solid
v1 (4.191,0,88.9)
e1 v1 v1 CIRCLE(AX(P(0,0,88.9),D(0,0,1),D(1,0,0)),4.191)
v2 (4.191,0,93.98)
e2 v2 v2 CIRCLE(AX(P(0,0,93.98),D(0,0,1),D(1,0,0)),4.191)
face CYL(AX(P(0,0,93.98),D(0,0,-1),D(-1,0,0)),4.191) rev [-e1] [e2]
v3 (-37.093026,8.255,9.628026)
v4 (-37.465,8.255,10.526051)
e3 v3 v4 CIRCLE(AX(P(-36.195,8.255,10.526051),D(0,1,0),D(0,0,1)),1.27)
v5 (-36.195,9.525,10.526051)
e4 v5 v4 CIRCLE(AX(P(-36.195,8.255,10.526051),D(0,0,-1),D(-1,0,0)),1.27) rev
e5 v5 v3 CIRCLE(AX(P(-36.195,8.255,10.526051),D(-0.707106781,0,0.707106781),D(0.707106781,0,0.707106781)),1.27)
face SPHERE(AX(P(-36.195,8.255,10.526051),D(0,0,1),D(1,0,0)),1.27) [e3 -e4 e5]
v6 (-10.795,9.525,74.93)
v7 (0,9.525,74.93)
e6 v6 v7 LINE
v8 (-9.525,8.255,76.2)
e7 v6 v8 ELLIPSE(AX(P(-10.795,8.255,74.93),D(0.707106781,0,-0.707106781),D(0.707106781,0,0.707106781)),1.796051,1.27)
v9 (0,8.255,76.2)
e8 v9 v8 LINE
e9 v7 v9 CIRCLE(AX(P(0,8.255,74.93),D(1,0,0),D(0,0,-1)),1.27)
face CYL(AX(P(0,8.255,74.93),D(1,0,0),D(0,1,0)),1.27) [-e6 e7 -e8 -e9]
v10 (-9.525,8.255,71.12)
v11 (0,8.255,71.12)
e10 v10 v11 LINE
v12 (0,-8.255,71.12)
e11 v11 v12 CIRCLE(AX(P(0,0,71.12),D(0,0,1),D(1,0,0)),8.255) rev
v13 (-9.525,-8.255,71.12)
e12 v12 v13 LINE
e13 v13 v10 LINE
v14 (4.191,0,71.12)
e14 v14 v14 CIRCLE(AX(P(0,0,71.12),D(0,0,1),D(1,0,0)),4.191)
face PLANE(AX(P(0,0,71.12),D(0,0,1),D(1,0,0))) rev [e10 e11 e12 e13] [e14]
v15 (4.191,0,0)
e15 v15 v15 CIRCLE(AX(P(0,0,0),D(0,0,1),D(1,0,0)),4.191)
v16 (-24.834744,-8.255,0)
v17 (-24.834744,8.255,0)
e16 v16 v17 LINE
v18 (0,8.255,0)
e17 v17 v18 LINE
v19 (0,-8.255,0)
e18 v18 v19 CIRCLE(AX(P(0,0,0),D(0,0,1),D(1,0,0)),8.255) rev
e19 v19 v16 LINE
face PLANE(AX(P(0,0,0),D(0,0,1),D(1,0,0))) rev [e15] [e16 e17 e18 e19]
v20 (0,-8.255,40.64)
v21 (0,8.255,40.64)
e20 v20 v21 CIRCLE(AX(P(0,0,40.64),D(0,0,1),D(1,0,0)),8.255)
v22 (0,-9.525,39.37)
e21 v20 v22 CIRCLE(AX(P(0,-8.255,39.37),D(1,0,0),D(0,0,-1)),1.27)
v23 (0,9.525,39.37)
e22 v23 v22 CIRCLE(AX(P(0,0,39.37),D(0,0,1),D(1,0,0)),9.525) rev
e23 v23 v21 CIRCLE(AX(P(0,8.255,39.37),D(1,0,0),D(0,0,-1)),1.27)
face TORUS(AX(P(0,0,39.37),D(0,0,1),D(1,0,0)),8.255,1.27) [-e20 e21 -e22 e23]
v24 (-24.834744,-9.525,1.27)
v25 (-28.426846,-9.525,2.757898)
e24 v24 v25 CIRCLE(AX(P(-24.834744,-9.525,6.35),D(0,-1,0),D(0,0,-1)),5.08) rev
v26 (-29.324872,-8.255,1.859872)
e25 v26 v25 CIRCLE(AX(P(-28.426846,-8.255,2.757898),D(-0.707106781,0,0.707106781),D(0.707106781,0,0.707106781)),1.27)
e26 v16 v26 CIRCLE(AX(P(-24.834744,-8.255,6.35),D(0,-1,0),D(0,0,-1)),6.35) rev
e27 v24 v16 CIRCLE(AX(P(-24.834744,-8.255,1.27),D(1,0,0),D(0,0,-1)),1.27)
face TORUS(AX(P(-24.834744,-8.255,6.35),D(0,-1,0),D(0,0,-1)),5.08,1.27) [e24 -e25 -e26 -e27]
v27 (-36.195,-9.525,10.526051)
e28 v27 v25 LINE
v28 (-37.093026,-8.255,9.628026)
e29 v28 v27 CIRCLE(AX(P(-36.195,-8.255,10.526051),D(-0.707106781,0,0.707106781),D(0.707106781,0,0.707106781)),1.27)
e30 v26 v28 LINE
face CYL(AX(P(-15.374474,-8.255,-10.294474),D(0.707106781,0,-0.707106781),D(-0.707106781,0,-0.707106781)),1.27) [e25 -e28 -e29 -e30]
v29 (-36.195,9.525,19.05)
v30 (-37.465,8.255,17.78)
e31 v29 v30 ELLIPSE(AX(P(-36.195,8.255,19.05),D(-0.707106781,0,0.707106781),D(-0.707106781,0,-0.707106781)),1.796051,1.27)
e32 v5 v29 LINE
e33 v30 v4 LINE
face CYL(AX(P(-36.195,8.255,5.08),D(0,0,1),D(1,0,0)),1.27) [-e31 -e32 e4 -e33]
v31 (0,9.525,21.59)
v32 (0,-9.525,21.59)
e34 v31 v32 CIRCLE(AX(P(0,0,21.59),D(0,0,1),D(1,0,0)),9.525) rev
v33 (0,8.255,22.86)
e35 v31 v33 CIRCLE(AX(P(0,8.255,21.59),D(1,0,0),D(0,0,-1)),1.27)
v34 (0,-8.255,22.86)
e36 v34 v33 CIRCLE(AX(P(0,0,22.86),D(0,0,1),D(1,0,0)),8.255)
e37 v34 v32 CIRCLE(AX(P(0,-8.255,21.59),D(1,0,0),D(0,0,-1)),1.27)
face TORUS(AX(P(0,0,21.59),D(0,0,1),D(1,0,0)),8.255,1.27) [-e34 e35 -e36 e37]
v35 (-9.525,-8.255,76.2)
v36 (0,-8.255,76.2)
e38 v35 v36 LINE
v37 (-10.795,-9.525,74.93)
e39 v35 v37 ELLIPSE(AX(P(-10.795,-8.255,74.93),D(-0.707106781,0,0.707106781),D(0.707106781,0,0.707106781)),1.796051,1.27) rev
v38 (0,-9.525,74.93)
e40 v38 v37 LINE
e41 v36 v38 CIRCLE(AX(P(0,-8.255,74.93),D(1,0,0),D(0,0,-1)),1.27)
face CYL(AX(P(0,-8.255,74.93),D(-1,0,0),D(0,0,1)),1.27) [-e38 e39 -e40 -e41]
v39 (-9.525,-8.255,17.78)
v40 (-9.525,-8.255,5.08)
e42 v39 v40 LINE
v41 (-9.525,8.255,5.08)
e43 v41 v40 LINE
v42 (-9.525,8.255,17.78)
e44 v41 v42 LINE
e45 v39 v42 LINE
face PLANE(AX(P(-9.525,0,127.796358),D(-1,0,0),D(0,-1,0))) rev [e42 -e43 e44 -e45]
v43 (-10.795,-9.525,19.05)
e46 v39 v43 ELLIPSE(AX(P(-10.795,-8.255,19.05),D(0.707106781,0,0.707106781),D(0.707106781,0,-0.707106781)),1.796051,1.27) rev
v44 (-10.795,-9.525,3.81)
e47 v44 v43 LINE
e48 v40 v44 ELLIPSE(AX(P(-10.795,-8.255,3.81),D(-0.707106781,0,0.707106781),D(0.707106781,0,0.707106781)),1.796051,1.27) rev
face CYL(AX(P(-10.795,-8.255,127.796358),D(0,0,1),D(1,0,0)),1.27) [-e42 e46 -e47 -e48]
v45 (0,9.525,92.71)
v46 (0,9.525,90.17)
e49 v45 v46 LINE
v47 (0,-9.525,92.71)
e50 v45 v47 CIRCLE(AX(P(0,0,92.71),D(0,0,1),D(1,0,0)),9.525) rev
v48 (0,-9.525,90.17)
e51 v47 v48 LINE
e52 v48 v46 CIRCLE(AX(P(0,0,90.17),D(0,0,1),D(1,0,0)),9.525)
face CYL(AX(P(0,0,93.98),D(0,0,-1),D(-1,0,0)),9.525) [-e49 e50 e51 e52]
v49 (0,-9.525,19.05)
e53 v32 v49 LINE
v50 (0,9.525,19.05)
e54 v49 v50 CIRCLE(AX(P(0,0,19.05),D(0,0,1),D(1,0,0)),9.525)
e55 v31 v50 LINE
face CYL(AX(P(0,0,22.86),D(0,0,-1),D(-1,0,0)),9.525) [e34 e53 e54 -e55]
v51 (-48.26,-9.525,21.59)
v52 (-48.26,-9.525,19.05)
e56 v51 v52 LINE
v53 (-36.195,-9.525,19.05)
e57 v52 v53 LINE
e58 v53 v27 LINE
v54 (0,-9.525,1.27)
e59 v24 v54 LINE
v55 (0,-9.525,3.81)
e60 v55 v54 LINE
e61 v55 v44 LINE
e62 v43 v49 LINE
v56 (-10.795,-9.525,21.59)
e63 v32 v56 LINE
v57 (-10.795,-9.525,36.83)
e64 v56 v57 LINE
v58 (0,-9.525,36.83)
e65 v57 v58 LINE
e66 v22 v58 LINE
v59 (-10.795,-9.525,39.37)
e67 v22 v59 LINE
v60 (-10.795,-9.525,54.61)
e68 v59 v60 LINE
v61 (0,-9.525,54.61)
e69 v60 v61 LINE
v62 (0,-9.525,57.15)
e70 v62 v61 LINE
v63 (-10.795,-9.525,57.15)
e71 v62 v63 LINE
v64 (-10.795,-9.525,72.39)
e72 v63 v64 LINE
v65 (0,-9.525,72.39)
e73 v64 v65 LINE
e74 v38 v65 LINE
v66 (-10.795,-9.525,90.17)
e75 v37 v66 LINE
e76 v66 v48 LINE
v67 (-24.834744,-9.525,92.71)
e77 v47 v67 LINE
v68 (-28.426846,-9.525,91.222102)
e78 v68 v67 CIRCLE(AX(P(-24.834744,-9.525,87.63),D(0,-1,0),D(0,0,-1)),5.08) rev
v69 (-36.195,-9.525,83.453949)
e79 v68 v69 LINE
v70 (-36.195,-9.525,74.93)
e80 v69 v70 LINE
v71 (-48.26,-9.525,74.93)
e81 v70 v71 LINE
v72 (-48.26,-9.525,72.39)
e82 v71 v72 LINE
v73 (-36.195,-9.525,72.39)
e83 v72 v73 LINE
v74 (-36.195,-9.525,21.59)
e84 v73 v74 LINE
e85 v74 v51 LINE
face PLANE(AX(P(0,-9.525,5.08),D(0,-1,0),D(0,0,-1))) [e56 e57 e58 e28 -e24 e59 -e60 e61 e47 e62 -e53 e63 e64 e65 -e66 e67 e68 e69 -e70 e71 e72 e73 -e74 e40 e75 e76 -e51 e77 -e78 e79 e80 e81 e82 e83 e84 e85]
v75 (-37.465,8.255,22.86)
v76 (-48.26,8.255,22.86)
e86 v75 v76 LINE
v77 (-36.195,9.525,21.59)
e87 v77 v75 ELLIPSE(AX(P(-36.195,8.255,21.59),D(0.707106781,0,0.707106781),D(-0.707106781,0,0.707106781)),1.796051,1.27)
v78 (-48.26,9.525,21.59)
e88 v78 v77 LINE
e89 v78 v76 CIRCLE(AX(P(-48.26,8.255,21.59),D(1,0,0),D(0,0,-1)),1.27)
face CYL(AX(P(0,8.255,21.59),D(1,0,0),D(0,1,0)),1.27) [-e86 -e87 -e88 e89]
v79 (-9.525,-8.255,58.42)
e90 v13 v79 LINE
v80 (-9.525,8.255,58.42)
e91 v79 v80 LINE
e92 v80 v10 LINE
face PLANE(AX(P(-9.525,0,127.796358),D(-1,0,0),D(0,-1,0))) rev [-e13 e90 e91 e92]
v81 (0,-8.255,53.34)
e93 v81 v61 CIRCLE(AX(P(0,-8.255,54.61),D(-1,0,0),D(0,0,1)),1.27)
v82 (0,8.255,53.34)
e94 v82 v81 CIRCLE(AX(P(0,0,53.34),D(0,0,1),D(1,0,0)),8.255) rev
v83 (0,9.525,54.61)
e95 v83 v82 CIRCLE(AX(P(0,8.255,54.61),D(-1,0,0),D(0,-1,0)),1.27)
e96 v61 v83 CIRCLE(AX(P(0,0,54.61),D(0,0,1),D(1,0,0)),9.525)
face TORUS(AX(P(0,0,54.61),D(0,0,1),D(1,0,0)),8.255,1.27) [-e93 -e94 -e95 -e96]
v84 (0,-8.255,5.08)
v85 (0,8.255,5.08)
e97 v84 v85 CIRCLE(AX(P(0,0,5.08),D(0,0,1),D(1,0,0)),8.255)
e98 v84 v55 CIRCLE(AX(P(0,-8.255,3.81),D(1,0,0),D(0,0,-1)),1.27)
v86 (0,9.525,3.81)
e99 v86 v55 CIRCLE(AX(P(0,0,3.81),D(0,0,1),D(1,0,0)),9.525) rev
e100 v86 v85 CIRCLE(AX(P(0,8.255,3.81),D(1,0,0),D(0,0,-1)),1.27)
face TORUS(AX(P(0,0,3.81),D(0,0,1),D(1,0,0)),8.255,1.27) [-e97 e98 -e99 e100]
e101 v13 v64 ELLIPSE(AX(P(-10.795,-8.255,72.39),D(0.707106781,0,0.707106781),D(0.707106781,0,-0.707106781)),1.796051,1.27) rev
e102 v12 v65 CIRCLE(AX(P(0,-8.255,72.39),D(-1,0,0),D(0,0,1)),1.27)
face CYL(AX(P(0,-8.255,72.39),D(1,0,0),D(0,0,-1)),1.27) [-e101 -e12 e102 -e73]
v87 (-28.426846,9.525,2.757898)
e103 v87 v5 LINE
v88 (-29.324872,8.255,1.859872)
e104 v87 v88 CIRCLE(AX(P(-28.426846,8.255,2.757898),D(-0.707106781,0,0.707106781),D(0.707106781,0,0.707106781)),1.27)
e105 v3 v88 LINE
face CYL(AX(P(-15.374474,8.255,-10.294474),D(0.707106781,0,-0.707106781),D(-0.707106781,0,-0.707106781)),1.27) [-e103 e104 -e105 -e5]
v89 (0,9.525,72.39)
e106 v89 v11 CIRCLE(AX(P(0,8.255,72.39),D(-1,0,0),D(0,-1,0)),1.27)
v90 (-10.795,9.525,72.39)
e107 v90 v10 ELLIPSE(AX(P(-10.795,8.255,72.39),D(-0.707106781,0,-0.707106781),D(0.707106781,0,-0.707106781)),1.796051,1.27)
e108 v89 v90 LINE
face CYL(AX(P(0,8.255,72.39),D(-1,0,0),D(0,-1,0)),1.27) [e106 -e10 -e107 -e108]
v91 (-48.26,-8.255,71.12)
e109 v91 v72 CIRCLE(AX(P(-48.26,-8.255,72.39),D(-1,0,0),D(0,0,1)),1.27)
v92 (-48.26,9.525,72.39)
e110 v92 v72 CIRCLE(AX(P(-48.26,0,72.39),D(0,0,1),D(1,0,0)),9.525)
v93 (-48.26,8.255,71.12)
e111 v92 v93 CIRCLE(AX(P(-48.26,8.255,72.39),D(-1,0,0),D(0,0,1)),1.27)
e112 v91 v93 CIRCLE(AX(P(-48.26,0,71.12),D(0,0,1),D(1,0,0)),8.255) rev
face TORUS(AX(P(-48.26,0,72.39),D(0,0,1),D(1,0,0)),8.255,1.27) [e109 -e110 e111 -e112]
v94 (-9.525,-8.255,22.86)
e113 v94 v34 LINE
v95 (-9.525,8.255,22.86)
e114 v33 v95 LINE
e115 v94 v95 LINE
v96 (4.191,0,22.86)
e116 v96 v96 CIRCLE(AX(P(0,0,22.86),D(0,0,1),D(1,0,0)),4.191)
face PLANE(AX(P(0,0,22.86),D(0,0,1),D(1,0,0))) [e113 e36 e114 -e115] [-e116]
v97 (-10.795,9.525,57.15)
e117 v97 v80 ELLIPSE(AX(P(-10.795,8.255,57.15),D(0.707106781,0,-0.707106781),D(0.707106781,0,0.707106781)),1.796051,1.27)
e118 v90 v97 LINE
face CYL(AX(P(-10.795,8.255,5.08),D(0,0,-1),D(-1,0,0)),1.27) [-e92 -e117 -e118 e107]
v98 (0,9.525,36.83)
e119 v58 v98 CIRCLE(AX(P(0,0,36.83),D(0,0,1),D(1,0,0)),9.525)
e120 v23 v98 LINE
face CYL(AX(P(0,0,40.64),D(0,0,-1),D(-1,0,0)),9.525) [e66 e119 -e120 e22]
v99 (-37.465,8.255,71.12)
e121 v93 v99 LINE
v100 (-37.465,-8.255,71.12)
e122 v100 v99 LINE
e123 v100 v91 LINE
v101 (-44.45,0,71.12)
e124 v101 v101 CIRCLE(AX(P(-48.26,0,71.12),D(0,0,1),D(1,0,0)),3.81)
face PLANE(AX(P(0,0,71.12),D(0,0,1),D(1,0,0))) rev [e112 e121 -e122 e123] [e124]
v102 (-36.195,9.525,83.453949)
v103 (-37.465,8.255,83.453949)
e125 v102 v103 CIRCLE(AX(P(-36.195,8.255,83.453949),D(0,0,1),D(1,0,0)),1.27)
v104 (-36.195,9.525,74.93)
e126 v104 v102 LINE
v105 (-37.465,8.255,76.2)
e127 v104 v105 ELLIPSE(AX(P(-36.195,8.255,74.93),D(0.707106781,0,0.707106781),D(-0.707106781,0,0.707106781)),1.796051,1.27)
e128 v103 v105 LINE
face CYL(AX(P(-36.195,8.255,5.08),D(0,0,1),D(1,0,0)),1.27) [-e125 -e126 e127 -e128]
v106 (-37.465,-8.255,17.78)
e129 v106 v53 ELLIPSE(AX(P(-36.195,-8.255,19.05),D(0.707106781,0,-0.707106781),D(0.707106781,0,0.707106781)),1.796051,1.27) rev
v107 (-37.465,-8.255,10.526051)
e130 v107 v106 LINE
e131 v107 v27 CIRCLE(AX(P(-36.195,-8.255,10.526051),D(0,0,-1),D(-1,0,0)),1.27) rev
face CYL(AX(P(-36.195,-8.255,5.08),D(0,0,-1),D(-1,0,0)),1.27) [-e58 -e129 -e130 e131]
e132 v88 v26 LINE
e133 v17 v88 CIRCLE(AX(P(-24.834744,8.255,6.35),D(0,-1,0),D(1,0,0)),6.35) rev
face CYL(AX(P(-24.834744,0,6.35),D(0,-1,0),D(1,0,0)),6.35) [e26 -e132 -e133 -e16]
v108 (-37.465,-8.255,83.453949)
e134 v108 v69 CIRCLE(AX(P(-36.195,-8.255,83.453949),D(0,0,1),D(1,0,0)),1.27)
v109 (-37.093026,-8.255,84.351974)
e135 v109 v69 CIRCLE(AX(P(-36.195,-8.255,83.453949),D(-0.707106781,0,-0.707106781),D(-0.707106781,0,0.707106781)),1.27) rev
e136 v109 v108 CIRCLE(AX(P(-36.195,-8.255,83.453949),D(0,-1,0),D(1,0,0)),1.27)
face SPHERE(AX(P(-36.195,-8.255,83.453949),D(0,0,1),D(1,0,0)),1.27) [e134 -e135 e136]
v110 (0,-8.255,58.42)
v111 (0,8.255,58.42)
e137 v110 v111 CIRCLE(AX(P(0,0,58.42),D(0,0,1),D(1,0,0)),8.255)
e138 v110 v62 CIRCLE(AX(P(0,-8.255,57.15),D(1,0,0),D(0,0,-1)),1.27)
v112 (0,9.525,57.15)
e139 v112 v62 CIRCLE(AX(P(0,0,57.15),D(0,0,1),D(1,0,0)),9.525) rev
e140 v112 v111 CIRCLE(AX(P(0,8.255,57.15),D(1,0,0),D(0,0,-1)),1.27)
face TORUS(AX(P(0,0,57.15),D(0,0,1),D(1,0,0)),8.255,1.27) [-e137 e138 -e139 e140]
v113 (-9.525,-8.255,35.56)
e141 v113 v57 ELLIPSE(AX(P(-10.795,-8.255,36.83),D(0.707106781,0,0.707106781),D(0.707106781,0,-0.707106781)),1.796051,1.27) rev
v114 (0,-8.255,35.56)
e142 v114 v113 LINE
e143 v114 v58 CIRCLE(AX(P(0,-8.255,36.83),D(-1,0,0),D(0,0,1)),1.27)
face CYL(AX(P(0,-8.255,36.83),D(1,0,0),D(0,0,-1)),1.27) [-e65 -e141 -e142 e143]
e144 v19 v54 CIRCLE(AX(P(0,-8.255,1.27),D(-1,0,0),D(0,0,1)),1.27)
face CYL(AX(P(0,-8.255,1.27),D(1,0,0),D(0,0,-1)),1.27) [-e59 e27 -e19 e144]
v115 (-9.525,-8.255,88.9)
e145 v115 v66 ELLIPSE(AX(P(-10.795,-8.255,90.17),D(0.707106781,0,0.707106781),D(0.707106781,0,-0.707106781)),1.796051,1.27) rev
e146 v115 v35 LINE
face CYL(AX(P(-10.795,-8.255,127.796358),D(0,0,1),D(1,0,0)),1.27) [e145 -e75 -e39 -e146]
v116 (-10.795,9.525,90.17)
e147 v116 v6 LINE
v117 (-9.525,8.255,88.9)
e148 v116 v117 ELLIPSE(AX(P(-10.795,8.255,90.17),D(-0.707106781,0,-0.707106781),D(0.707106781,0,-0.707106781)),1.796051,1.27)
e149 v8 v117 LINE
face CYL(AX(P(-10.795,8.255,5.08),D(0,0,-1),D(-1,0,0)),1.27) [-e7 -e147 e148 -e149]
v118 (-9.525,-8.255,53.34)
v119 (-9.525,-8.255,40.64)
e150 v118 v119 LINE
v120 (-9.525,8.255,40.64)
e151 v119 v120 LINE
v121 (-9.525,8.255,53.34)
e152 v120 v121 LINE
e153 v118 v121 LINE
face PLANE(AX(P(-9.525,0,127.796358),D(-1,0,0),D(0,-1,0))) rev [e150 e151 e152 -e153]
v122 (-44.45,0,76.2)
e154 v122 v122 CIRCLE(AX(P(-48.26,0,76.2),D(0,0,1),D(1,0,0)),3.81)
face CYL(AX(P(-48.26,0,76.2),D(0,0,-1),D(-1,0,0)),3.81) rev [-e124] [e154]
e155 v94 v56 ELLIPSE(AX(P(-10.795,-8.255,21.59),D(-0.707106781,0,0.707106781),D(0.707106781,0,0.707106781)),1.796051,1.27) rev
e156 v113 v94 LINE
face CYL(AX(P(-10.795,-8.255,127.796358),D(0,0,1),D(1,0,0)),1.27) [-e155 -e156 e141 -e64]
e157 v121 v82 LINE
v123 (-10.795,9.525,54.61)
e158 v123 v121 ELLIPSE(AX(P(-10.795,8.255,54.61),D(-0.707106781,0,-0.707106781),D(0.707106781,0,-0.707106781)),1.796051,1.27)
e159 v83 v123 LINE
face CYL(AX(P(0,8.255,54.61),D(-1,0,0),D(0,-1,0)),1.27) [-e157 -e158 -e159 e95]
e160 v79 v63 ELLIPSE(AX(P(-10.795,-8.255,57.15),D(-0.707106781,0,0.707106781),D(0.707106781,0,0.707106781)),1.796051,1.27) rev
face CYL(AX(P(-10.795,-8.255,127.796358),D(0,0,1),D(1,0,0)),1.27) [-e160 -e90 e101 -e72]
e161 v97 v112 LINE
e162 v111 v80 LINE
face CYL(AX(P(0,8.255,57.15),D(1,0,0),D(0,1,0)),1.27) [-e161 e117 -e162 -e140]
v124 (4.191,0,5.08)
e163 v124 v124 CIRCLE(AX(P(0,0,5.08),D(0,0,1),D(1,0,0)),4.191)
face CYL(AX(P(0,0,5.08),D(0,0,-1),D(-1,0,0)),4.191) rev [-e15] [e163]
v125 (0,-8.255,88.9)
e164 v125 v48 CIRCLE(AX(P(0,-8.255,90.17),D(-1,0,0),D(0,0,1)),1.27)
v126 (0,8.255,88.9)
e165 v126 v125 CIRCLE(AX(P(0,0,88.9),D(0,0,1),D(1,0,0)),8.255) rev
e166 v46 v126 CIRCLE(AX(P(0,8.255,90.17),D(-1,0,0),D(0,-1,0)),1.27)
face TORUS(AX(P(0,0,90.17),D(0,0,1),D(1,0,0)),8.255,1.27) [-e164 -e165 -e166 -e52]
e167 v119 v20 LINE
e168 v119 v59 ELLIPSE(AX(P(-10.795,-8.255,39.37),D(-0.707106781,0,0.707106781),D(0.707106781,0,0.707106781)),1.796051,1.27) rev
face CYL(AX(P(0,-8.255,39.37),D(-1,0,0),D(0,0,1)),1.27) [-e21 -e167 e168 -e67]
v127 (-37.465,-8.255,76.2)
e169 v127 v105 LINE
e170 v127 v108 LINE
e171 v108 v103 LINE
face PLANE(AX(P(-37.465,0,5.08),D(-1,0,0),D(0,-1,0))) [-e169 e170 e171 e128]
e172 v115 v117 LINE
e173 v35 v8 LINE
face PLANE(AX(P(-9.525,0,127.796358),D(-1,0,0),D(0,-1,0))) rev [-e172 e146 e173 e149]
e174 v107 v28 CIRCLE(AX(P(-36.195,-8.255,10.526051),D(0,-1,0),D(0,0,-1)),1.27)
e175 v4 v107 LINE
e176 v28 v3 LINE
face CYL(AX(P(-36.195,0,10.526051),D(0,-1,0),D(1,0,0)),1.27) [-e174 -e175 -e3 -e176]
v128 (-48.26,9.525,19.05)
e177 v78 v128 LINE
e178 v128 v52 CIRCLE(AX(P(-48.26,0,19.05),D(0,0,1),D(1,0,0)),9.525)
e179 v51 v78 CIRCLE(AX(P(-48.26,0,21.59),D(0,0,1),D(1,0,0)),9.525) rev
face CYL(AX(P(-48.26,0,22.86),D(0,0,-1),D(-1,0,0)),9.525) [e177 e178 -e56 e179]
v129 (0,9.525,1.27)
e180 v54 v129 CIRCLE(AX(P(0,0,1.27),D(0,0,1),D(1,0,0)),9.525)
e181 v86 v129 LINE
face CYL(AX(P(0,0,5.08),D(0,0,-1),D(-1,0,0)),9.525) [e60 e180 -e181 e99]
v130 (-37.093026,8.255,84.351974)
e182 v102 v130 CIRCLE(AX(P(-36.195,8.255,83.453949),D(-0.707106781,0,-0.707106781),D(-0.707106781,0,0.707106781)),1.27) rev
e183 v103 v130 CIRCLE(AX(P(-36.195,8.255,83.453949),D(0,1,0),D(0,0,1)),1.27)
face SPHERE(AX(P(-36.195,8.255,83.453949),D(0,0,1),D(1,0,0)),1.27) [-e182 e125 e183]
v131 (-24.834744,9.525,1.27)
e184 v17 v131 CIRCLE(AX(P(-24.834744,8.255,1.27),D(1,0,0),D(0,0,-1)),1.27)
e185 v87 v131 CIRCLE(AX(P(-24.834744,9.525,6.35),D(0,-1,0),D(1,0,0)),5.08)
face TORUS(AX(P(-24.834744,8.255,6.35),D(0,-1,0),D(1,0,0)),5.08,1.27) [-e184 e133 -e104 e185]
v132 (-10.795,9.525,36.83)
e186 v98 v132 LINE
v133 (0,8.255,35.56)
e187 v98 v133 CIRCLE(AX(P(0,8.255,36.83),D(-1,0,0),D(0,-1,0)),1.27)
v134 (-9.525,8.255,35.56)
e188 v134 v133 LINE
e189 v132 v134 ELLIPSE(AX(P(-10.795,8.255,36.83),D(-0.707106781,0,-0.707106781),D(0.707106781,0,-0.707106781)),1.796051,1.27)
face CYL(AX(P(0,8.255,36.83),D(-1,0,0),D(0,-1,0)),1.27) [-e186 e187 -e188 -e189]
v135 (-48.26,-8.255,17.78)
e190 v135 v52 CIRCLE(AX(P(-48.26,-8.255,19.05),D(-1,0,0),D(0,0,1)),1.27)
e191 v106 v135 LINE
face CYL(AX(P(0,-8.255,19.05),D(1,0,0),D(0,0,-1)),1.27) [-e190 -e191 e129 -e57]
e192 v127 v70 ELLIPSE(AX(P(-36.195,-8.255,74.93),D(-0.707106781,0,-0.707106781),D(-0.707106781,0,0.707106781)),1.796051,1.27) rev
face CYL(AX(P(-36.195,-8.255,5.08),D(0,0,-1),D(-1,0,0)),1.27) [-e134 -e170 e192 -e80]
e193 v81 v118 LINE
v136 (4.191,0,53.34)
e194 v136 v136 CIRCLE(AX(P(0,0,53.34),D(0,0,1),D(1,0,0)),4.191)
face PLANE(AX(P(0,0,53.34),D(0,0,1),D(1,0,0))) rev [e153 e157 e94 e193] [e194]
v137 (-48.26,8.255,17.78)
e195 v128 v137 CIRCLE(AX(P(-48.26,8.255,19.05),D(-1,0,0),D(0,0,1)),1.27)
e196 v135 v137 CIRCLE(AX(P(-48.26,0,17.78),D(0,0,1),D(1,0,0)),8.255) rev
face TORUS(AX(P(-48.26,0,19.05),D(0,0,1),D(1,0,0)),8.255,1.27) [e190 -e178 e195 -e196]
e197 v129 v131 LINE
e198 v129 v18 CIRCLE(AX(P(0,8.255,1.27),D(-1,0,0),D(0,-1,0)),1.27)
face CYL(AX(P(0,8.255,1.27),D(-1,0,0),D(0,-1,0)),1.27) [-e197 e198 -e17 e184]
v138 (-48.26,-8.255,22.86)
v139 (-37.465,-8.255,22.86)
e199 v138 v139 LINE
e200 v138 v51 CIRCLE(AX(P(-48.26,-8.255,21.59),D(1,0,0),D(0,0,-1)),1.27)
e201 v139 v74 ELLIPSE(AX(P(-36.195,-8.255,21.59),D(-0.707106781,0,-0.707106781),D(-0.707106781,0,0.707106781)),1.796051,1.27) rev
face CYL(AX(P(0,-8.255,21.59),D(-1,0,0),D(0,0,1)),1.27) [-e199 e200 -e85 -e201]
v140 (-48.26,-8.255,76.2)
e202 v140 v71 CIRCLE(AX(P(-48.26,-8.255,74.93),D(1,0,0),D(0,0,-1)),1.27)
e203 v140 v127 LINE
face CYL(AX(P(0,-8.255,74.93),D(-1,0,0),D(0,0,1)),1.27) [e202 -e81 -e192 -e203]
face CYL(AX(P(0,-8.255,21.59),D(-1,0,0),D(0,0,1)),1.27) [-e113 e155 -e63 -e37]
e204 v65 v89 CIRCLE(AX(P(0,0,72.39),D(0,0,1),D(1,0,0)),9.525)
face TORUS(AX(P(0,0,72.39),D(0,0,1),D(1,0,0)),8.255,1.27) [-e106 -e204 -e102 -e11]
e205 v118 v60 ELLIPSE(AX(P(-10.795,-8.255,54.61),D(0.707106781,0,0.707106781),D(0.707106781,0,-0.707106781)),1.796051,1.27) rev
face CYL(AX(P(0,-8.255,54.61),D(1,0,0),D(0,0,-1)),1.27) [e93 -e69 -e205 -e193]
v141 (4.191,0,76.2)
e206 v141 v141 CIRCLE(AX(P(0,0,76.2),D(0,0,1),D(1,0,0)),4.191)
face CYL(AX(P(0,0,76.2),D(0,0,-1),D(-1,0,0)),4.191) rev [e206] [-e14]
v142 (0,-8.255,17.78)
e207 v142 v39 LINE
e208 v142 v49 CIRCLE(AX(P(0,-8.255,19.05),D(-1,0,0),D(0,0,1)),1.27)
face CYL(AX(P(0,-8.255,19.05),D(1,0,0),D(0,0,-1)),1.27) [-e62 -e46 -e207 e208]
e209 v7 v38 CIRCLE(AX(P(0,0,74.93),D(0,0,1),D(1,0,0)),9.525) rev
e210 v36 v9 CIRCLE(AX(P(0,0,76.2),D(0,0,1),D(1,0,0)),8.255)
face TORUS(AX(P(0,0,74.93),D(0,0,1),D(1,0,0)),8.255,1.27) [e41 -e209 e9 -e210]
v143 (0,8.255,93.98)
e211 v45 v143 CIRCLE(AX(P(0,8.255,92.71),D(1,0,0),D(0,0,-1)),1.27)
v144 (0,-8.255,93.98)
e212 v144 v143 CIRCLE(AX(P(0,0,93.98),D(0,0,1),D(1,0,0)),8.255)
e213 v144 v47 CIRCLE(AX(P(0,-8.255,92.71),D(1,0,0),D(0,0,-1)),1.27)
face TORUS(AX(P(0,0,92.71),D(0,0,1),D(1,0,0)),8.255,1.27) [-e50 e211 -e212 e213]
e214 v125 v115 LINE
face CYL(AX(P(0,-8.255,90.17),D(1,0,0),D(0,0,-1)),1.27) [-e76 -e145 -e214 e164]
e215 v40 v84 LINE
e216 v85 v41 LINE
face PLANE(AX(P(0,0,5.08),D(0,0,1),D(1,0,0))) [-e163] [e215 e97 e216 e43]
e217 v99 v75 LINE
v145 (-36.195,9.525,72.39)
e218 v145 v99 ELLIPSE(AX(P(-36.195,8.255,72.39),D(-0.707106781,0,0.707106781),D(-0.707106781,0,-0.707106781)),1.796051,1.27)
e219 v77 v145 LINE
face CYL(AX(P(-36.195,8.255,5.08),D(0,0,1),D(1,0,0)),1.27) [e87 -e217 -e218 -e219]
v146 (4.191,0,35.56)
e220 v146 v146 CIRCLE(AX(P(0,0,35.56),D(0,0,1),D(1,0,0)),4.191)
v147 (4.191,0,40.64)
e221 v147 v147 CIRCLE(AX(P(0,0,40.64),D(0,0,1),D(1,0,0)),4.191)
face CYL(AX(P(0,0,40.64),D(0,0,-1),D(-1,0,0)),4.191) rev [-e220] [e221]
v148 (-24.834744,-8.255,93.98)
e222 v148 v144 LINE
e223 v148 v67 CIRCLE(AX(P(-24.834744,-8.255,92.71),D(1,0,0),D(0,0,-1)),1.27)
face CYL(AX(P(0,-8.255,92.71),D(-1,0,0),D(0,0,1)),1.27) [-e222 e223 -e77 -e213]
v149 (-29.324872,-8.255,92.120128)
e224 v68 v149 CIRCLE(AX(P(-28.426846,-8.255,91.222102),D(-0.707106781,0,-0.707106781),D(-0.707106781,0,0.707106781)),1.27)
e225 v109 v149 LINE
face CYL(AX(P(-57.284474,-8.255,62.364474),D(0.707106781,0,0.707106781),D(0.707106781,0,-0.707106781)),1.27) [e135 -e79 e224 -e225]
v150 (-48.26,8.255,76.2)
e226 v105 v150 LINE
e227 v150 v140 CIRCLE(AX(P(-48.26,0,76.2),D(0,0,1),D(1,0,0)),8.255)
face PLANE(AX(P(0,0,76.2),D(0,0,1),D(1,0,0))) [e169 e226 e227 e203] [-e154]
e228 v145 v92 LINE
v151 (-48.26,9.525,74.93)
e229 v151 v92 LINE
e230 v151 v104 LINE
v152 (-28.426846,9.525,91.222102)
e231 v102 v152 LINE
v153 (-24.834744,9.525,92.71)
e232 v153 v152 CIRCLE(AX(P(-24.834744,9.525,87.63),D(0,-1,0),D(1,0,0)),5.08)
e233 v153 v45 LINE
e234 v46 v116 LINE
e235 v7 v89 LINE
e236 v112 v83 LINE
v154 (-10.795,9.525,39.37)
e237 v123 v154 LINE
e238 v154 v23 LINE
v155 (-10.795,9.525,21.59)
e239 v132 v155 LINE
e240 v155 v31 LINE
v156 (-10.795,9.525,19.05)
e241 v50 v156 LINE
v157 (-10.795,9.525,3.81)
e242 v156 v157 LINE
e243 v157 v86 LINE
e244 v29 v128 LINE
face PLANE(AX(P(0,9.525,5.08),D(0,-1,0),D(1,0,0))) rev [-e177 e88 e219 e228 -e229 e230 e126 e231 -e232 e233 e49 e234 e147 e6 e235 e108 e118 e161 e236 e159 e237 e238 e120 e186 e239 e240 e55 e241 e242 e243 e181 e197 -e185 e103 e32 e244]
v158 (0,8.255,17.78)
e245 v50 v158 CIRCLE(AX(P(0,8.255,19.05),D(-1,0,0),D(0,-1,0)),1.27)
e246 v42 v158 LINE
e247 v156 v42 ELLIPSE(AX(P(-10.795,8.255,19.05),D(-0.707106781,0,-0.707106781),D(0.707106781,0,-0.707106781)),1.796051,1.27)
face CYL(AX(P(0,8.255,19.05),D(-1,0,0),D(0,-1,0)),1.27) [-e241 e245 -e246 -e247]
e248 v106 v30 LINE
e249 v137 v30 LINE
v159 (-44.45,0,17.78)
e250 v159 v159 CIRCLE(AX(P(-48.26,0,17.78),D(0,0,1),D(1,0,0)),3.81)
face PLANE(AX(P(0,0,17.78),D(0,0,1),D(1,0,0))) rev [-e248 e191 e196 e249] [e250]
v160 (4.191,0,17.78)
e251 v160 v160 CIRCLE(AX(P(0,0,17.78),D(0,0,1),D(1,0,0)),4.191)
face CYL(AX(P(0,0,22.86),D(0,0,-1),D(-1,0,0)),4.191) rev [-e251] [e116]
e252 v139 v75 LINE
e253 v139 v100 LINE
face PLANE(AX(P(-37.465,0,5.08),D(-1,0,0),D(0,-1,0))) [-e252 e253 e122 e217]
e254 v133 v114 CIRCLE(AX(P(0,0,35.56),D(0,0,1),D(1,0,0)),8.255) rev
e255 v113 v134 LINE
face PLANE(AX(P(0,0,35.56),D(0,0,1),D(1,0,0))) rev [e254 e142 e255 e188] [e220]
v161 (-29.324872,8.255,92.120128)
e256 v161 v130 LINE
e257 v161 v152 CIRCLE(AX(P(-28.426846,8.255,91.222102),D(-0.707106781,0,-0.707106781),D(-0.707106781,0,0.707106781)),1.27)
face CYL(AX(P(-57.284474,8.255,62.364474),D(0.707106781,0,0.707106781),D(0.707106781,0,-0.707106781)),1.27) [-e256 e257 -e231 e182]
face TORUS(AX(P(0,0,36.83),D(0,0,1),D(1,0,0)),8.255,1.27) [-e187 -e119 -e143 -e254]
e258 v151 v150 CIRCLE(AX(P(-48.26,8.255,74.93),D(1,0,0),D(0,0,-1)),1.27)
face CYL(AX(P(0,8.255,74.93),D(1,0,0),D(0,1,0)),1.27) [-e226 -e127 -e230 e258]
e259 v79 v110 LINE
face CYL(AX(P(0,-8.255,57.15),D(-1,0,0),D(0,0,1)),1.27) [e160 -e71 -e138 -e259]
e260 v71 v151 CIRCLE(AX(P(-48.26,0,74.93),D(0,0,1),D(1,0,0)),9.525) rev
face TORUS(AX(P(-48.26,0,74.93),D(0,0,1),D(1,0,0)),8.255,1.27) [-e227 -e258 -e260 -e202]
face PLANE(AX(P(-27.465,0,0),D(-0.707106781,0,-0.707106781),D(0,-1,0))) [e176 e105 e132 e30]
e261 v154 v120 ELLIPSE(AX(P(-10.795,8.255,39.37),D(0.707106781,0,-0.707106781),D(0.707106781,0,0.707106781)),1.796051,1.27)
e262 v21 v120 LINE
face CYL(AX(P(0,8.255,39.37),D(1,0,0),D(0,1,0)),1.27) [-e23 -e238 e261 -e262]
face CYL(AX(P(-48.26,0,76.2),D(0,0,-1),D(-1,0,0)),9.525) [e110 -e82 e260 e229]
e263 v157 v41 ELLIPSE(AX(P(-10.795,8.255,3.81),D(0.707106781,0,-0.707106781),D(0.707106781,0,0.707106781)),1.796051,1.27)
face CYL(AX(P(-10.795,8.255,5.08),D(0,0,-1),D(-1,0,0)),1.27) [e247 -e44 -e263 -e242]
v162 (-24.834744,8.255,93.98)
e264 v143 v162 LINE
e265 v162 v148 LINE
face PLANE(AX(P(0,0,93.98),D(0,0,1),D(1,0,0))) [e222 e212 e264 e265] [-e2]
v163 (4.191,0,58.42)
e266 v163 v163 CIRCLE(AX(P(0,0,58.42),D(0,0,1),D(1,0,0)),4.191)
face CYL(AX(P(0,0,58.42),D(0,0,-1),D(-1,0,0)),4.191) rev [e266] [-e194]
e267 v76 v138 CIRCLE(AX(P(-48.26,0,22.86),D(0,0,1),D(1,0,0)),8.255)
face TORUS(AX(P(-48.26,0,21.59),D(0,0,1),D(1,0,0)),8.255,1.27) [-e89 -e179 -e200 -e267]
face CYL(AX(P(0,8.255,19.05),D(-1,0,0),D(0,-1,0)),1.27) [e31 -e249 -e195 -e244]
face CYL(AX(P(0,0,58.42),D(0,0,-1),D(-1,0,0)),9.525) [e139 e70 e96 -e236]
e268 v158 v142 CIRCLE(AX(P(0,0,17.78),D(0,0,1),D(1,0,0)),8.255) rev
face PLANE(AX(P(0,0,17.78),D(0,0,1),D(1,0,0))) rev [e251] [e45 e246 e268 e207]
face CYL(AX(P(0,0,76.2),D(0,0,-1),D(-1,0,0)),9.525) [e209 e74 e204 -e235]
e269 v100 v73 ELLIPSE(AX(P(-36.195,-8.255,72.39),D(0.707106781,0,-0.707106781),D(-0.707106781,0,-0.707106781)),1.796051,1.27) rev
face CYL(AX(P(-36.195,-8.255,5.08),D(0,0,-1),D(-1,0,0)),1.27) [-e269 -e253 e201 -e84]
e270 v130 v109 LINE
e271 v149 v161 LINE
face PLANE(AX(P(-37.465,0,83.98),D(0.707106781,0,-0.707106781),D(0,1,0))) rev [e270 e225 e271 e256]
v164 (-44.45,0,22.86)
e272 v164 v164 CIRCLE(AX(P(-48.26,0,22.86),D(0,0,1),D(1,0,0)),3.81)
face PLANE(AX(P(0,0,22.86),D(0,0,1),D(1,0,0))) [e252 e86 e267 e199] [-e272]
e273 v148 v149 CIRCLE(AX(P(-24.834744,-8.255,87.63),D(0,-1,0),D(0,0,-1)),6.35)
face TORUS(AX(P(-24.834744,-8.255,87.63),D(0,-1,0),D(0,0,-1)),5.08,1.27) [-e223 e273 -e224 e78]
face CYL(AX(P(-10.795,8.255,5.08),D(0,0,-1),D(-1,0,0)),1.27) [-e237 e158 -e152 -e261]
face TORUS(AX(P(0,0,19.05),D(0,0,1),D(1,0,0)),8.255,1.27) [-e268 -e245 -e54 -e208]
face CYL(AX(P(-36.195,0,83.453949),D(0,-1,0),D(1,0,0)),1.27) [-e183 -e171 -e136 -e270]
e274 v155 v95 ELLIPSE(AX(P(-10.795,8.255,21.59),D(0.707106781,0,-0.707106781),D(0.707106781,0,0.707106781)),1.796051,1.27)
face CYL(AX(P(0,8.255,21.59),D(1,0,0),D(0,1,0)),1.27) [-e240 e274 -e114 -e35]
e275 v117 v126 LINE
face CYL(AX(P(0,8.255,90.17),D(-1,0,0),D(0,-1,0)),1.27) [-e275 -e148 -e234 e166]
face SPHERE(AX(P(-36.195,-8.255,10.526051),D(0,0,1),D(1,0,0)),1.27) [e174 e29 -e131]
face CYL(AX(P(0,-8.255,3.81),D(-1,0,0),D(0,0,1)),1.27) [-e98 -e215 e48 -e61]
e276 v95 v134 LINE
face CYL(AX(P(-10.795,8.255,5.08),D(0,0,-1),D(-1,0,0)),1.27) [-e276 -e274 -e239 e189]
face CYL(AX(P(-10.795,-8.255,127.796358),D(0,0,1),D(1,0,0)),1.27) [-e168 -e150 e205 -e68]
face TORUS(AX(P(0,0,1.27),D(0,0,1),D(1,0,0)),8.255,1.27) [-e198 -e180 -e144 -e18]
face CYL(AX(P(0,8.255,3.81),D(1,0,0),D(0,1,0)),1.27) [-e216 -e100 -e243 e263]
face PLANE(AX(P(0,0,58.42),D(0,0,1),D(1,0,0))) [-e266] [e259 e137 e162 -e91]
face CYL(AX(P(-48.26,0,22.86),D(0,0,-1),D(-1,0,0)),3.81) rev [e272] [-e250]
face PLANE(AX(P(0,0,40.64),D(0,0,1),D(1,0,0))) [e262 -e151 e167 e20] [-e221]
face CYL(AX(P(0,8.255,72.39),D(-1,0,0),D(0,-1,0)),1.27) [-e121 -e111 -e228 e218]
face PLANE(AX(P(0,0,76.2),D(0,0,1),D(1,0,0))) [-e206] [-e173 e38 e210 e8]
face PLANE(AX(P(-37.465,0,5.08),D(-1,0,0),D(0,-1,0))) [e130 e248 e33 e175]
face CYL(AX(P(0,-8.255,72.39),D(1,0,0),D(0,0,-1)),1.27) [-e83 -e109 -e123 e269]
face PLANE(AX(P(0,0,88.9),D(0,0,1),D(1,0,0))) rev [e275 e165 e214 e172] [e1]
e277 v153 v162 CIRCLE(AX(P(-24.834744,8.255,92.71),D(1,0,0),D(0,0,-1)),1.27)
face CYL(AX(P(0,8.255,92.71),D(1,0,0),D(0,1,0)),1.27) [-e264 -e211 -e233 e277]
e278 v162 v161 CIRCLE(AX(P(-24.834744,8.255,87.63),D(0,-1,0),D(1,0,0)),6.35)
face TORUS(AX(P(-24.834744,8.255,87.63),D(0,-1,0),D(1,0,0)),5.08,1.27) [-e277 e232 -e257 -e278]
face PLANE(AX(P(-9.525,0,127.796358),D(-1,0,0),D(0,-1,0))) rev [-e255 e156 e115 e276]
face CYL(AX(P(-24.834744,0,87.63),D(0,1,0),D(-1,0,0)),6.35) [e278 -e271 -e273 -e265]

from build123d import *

# Parameters (mm, degrees)
SKETCH3_R                            = 4.191
BASE_GROOVE_EXTRUDE_DEPTH            = 5.08
GROOVE_PATTERN_COUNT                 = 6
GROOVE_PATTERN_PITCH                 = 17.78
UPPERFOOT_START                      = 71.12
SKETCH3_8_R                          = 3.81
UPPERFOOT_CONNECTION_EXTRUDE_1_DEPTH = 5.08
UPPERFOOT_START_2                    = 17.78
SKETCH3_9_R                          = 3.81
UPPERFOOT_CONNECTION_EXTRUDE_2_DEPTH = 5.08
BODY_EXTRUDE_DEPTH                   = 93.98
CHAMFER1_SIZE                        = 10
FILLET25_R                           = 1.27
FILLET26_R                           = 6.35


with BuildPart() as part:
    # Sketch3 → Base Groove Extrude (new body)
    with BuildSketch(Plane.XY):
        with BuildLine():
            ThreePointArc((0, -9.525), (9.525, 0), (0, 9.525))
            Line((0, 9.525), (-37.465, 9.525))
            Line((-37.465, 9.525), (-37.465, -9.525))
            Line((-37.465, -9.525), (0, -9.525))
        make_face()
        Circle(SKETCH3_R, mode=Mode.SUBTRACT)
    extrude(amount=BASE_GROOVE_EXTRUDE_DEPTH)


with BuildPart() as groove_pattern_1:
    # Groove Pattern: pattern copy
    add(part.part.moved(Location(Vector(0, 0, 1) * (1 * GROOVE_PATTERN_PITCH))))

    # Sketch3<9> → Upperfoot Connection Extrude 2 (add)
    with BuildSketch(Plane.XY.offset(UPPERFOOT_START_2)):
        with BuildLine():
            Line((-37.465, 9.525), (-48.26, 9.525))
            ThreePointArc((-48.26, 9.525), (-57.785, 0), (-48.26, -9.525))
            Line((-48.26, -9.525), (-37.465, -9.525))
            Line((-37.465, -9.525), (-37.465, 9.525))
        make_face()
        with Locations((-48.26, 0)):
            Circle(SKETCH3_9_R, mode=Mode.SUBTRACT)
    extrude(amount=UPPERFOOT_CONNECTION_EXTRUDE_2_DEPTH)


with BuildPart() as groove_pattern_2:
    # Groove Pattern: pattern copy
    add(part.part.moved(Location(Vector(0, 0, 1) * (2 * GROOVE_PATTERN_PITCH))))


with BuildPart() as groove_pattern_3:
    # Groove Pattern: pattern copy
    add(part.part.moved(Location(Vector(0, 0, 1) * (3 * GROOVE_PATTERN_PITCH))))


with BuildPart() as groove_pattern_4:
    # Groove Pattern: pattern copy
    add(part.part.moved(Location(Vector(0, 0, 1) * (4 * GROOVE_PATTERN_PITCH))))

    # Sketch3<8> → Upperfoot Connection Extrude 1 (add)
    with BuildSketch(Plane.XY.offset(UPPERFOOT_START)):
        with BuildLine():
            Line((-37.465, 9.525), (-48.26, 9.525))
            ThreePointArc((-48.26, 9.525), (-57.785, 0), (-48.26, -9.525))
            Line((-48.26, -9.525), (-37.465, -9.525))
            Line((-37.465, -9.525), (-37.465, 9.525))
        make_face()
        with Locations((-48.26, 0)):
            Circle(SKETCH3_8_R, mode=Mode.SUBTRACT)
    extrude(amount=UPPERFOOT_CONNECTION_EXTRUDE_1_DEPTH)


with BuildPart() as groove_pattern_5:
    # Groove Pattern: pattern copy
    add(part.part.moved(Location(Vector(0, 0, 1) * (5 * GROOVE_PATTERN_PITCH))))


with BuildPart() as part_1:
    add(part.part)

    add(groove_pattern_1.part)  # Body Extrude merges Groove Pattern_1

    add(groove_pattern_2.part)  # Body Extrude merges Groove Pattern_2

    add(groove_pattern_3.part)  # Body Extrude merges Groove Pattern_3

    add(groove_pattern_4.part)  # Body Extrude merges Groove Pattern_4

    add(groove_pattern_5.part)  # Body Extrude merges Groove Pattern_5
    # Sketch3<10> → Body Extrude (add)
    with BuildSketch(Plane.XY):
        Polygon((-9.525, -4.2e-08), (-9.525, 9.525), (-37.465, 9.525), (-37.465, 0), (-37.465, -9.525), (-9.525, -9.525), align=None)
    extrude(amount=BODY_EXTRUDE_DEPTH)

    # Chamfer1
    chamfer1_edges = [part_1.edges().sort_by_distance(p)[0] for p in [
        (-37.465, 0, 93.98),
        (-37.465, 0, 0),
    ]]
    chamfer(chamfer1_edges, length=CHAMFER1_SIZE)

    # Fillet25
    fillet25_edges = [part_1.edges().sort_by_distance(p)[0] for p in [
        (-37.465, 9.525, 13.89),
        (-37.465, -9.525, 13.89),
        (-9.525, 9.525, 11.43),
        (-9.525, -9.525, 11.43),
        (-4.7625, -9.525, 22.86),
        (-4.7625, 9.525, 17.78),
        (9.525, 0, 22.86),
        (-4.7625, 9.525, 22.86),
        (-4.7625, -9.525, 17.78),
        (-42.8625, -9.525, 22.86),
        (9.525, 0, 17.78),
        (-42.8625, 9.525, 17.78),
        (-42.8625, 9.525, 22.86),
        (-57.785, 0, 22.86),
        (-42.8625, -9.525, 17.78),
        (-57.785, 0, 17.78),
        (9.525, 0, 5.08),
        (-37.465, -9.525, 46.99),
        (-37.465, 9.525, 46.99),
        (-9.525, 9.525, 64.77),
        (-9.525, -9.525, 64.77),
        (-4.7625, -9.525, 76.2),
        (-4.7625, 9.525, 71.12),
        (9.525, 0, 76.2),
        (-4.7625, 9.525, 76.2),
        (-4.7625, -9.525, 71.12),
        (-42.8625, -9.525, 76.2),
        (9.525, 0, 71.12),
        (-42.8625, 9.525, 71.12),
        (-42.8625, 9.525, 76.2),
        (-57.785, 0, 76.2),
        (-42.8625, -9.525, 71.12),
        (-57.785, 0, 71.12),
        (-4.7625, 9.525, 5.08),
        (-37.465, 9.525, 80.09),
        (-32.465, 9.525, 88.98),
        (-32.465, 9.525, 5),
        (-37.465, 0, 10),
        (-37.465, -9.525, 80.09),
        (-32.465, -9.525, 88.98),
        (-32.465, -9.525, 5),
        (-37.465, 0, 83.98),
        (-13.7325, 9.525, 93.98),
        (-13.7325, -9.525, 93.98),
        (-9.525, 9.525, 29.21),
        (-9.525, -9.525, 29.21),
        (-4.7625, -9.525, 40.64),
        (-4.7625, 9.525, 35.56),
        (9.525, 0, 40.64),
        (-4.7625, 9.525, 40.64),
        (-4.7625, -9.525, 35.56),
        (9.525, 0, 35.56),
        (-4.7625, -9.525, 5.08),
        (-9.525, -9.525, 46.99),
        (-9.525, 9.525, 46.99),
        (-4.7625, -9.525, 58.42),
        (-4.7625, 9.525, 53.34),
        (9.525, 0, 58.42),
        (-4.7625, 9.525, 58.42),
        (-4.7625, -9.525, 53.34),
        (9.525, 0, 53.34),
        (-13.7325, 9.525, 0),
        (-9.525, -9.525, 82.55),
        (-9.525, 9.525, 82.55),
        (9.525, 0, 0),
        (-4.7625, 9.525, 88.9),
        (9.525, 0, 93.98),
        (-4.7625, -9.525, 88.9),
        (9.525, 0, 88.9),
        (-13.7325, -9.525, 0),
    ]]
    fillet(fillet25_edges, radius=FILLET25_R)

    # Fillet26
    # the kernel refuses this fillet: 6.35 mm, written as the material it takes off along each edge
    with BuildSketch(Plane(origin=(-24.834743879, -9.525, 87.63), x_dir=(0, 0, 1), z_dir=(1, 0, 0))) as fillet26_piece_1:
        with BuildLine():
            CenterArc((5.08, -1.27), 1.27, 0, 90)
            Line((6.35, -1.27), (6.35, 0))
            Line((6.35, 0), (5.08, 0))
        make_face()
    revolve(axis=Axis((-24.834743879, -9.525, 87.63), (0, -1, 0)), revolution_arc=45, mode=Mode.SUBTRACT)
    with BuildSketch(Plane(origin=(-24.834743879, 9.525, 87.63), x_dir=(-0.7071067811865476, 0, 0.7071067811865476), z_dir=(-0.7071067811865476, 0, -0.7071067811865476))) as fillet26_piece_2:
        with BuildLine():
            CenterArc((5.08, -1.27), 1.27, 0, 90)
            Line((6.35, -1.27), (6.35, 0))
            Line((6.35, 0), (5.08, 0))
        make_face()
    revolve(axis=Axis((-24.834743879, 9.525, 87.63), (0, 1, 0)), revolution_arc=45, mode=Mode.SUBTRACT)
    with BuildSketch(Plane(origin=(-24.834743879, 9.525, 6.35), x_dir=(0, 0, -1), z_dir=(1, 0, 0))) as fillet26_piece_3:
        with BuildLine():
            CenterArc((5.08, -1.27), 1.27, 0, 90)
            Line((6.35, -1.27), (6.35, 0))
            Line((6.35, 0), (5.08, 0))
        make_face()
    revolve(axis=Axis((-24.834743879, 9.525, 6.35), (0, 1, 0)), revolution_arc=45, mode=Mode.SUBTRACT)
    with BuildSketch(Plane(origin=(-24.834743879, -9.525, 6.35), x_dir=(-0.7071067811865476, 0, -0.7071067811865476), z_dir=(-0.7071067811865476, 0, 0.7071067811865476))) as fillet26_piece_4:
        with BuildLine():
            CenterArc((5.08, -1.27), 1.27, 0, 90)
            Line((6.35, -1.27), (6.35, 0))
            Line((6.35, 0), (5.08, 0))
        make_face()
    revolve(axis=Axis((-24.834743879, -9.525, 6.35), (0, -1, 0)), revolution_arc=45, mode=Mode.SUBTRACT)
    with BuildSketch(Plane(origin=(-27.465, 9.525, 93.98), x_dir=(1, 0, 0), z_dir=(0, -1, 0)), Plane(origin=(-27.465, 9.525, 0), x_dir=(-0.7071067811865476, 0, 0.7071067811865476), z_dir=(0, -1, 0))) as fillet26_piece_5:
        with BuildLine():
            CenterArc((FILLET26_R * 0.414213562373, -FILLET26_R), FILLET26_R, 90, 45)
            Line((-FILLET26_R * 0.292893218813, -FILLET26_R * 0.292893218813), (0, 0))
            Line((0, 0), (FILLET26_R * 0.414213562373, 0))
        make_face()
    extrude(amount=19.05, mode=Mode.SUBTRACT)


solid = part_1.part
